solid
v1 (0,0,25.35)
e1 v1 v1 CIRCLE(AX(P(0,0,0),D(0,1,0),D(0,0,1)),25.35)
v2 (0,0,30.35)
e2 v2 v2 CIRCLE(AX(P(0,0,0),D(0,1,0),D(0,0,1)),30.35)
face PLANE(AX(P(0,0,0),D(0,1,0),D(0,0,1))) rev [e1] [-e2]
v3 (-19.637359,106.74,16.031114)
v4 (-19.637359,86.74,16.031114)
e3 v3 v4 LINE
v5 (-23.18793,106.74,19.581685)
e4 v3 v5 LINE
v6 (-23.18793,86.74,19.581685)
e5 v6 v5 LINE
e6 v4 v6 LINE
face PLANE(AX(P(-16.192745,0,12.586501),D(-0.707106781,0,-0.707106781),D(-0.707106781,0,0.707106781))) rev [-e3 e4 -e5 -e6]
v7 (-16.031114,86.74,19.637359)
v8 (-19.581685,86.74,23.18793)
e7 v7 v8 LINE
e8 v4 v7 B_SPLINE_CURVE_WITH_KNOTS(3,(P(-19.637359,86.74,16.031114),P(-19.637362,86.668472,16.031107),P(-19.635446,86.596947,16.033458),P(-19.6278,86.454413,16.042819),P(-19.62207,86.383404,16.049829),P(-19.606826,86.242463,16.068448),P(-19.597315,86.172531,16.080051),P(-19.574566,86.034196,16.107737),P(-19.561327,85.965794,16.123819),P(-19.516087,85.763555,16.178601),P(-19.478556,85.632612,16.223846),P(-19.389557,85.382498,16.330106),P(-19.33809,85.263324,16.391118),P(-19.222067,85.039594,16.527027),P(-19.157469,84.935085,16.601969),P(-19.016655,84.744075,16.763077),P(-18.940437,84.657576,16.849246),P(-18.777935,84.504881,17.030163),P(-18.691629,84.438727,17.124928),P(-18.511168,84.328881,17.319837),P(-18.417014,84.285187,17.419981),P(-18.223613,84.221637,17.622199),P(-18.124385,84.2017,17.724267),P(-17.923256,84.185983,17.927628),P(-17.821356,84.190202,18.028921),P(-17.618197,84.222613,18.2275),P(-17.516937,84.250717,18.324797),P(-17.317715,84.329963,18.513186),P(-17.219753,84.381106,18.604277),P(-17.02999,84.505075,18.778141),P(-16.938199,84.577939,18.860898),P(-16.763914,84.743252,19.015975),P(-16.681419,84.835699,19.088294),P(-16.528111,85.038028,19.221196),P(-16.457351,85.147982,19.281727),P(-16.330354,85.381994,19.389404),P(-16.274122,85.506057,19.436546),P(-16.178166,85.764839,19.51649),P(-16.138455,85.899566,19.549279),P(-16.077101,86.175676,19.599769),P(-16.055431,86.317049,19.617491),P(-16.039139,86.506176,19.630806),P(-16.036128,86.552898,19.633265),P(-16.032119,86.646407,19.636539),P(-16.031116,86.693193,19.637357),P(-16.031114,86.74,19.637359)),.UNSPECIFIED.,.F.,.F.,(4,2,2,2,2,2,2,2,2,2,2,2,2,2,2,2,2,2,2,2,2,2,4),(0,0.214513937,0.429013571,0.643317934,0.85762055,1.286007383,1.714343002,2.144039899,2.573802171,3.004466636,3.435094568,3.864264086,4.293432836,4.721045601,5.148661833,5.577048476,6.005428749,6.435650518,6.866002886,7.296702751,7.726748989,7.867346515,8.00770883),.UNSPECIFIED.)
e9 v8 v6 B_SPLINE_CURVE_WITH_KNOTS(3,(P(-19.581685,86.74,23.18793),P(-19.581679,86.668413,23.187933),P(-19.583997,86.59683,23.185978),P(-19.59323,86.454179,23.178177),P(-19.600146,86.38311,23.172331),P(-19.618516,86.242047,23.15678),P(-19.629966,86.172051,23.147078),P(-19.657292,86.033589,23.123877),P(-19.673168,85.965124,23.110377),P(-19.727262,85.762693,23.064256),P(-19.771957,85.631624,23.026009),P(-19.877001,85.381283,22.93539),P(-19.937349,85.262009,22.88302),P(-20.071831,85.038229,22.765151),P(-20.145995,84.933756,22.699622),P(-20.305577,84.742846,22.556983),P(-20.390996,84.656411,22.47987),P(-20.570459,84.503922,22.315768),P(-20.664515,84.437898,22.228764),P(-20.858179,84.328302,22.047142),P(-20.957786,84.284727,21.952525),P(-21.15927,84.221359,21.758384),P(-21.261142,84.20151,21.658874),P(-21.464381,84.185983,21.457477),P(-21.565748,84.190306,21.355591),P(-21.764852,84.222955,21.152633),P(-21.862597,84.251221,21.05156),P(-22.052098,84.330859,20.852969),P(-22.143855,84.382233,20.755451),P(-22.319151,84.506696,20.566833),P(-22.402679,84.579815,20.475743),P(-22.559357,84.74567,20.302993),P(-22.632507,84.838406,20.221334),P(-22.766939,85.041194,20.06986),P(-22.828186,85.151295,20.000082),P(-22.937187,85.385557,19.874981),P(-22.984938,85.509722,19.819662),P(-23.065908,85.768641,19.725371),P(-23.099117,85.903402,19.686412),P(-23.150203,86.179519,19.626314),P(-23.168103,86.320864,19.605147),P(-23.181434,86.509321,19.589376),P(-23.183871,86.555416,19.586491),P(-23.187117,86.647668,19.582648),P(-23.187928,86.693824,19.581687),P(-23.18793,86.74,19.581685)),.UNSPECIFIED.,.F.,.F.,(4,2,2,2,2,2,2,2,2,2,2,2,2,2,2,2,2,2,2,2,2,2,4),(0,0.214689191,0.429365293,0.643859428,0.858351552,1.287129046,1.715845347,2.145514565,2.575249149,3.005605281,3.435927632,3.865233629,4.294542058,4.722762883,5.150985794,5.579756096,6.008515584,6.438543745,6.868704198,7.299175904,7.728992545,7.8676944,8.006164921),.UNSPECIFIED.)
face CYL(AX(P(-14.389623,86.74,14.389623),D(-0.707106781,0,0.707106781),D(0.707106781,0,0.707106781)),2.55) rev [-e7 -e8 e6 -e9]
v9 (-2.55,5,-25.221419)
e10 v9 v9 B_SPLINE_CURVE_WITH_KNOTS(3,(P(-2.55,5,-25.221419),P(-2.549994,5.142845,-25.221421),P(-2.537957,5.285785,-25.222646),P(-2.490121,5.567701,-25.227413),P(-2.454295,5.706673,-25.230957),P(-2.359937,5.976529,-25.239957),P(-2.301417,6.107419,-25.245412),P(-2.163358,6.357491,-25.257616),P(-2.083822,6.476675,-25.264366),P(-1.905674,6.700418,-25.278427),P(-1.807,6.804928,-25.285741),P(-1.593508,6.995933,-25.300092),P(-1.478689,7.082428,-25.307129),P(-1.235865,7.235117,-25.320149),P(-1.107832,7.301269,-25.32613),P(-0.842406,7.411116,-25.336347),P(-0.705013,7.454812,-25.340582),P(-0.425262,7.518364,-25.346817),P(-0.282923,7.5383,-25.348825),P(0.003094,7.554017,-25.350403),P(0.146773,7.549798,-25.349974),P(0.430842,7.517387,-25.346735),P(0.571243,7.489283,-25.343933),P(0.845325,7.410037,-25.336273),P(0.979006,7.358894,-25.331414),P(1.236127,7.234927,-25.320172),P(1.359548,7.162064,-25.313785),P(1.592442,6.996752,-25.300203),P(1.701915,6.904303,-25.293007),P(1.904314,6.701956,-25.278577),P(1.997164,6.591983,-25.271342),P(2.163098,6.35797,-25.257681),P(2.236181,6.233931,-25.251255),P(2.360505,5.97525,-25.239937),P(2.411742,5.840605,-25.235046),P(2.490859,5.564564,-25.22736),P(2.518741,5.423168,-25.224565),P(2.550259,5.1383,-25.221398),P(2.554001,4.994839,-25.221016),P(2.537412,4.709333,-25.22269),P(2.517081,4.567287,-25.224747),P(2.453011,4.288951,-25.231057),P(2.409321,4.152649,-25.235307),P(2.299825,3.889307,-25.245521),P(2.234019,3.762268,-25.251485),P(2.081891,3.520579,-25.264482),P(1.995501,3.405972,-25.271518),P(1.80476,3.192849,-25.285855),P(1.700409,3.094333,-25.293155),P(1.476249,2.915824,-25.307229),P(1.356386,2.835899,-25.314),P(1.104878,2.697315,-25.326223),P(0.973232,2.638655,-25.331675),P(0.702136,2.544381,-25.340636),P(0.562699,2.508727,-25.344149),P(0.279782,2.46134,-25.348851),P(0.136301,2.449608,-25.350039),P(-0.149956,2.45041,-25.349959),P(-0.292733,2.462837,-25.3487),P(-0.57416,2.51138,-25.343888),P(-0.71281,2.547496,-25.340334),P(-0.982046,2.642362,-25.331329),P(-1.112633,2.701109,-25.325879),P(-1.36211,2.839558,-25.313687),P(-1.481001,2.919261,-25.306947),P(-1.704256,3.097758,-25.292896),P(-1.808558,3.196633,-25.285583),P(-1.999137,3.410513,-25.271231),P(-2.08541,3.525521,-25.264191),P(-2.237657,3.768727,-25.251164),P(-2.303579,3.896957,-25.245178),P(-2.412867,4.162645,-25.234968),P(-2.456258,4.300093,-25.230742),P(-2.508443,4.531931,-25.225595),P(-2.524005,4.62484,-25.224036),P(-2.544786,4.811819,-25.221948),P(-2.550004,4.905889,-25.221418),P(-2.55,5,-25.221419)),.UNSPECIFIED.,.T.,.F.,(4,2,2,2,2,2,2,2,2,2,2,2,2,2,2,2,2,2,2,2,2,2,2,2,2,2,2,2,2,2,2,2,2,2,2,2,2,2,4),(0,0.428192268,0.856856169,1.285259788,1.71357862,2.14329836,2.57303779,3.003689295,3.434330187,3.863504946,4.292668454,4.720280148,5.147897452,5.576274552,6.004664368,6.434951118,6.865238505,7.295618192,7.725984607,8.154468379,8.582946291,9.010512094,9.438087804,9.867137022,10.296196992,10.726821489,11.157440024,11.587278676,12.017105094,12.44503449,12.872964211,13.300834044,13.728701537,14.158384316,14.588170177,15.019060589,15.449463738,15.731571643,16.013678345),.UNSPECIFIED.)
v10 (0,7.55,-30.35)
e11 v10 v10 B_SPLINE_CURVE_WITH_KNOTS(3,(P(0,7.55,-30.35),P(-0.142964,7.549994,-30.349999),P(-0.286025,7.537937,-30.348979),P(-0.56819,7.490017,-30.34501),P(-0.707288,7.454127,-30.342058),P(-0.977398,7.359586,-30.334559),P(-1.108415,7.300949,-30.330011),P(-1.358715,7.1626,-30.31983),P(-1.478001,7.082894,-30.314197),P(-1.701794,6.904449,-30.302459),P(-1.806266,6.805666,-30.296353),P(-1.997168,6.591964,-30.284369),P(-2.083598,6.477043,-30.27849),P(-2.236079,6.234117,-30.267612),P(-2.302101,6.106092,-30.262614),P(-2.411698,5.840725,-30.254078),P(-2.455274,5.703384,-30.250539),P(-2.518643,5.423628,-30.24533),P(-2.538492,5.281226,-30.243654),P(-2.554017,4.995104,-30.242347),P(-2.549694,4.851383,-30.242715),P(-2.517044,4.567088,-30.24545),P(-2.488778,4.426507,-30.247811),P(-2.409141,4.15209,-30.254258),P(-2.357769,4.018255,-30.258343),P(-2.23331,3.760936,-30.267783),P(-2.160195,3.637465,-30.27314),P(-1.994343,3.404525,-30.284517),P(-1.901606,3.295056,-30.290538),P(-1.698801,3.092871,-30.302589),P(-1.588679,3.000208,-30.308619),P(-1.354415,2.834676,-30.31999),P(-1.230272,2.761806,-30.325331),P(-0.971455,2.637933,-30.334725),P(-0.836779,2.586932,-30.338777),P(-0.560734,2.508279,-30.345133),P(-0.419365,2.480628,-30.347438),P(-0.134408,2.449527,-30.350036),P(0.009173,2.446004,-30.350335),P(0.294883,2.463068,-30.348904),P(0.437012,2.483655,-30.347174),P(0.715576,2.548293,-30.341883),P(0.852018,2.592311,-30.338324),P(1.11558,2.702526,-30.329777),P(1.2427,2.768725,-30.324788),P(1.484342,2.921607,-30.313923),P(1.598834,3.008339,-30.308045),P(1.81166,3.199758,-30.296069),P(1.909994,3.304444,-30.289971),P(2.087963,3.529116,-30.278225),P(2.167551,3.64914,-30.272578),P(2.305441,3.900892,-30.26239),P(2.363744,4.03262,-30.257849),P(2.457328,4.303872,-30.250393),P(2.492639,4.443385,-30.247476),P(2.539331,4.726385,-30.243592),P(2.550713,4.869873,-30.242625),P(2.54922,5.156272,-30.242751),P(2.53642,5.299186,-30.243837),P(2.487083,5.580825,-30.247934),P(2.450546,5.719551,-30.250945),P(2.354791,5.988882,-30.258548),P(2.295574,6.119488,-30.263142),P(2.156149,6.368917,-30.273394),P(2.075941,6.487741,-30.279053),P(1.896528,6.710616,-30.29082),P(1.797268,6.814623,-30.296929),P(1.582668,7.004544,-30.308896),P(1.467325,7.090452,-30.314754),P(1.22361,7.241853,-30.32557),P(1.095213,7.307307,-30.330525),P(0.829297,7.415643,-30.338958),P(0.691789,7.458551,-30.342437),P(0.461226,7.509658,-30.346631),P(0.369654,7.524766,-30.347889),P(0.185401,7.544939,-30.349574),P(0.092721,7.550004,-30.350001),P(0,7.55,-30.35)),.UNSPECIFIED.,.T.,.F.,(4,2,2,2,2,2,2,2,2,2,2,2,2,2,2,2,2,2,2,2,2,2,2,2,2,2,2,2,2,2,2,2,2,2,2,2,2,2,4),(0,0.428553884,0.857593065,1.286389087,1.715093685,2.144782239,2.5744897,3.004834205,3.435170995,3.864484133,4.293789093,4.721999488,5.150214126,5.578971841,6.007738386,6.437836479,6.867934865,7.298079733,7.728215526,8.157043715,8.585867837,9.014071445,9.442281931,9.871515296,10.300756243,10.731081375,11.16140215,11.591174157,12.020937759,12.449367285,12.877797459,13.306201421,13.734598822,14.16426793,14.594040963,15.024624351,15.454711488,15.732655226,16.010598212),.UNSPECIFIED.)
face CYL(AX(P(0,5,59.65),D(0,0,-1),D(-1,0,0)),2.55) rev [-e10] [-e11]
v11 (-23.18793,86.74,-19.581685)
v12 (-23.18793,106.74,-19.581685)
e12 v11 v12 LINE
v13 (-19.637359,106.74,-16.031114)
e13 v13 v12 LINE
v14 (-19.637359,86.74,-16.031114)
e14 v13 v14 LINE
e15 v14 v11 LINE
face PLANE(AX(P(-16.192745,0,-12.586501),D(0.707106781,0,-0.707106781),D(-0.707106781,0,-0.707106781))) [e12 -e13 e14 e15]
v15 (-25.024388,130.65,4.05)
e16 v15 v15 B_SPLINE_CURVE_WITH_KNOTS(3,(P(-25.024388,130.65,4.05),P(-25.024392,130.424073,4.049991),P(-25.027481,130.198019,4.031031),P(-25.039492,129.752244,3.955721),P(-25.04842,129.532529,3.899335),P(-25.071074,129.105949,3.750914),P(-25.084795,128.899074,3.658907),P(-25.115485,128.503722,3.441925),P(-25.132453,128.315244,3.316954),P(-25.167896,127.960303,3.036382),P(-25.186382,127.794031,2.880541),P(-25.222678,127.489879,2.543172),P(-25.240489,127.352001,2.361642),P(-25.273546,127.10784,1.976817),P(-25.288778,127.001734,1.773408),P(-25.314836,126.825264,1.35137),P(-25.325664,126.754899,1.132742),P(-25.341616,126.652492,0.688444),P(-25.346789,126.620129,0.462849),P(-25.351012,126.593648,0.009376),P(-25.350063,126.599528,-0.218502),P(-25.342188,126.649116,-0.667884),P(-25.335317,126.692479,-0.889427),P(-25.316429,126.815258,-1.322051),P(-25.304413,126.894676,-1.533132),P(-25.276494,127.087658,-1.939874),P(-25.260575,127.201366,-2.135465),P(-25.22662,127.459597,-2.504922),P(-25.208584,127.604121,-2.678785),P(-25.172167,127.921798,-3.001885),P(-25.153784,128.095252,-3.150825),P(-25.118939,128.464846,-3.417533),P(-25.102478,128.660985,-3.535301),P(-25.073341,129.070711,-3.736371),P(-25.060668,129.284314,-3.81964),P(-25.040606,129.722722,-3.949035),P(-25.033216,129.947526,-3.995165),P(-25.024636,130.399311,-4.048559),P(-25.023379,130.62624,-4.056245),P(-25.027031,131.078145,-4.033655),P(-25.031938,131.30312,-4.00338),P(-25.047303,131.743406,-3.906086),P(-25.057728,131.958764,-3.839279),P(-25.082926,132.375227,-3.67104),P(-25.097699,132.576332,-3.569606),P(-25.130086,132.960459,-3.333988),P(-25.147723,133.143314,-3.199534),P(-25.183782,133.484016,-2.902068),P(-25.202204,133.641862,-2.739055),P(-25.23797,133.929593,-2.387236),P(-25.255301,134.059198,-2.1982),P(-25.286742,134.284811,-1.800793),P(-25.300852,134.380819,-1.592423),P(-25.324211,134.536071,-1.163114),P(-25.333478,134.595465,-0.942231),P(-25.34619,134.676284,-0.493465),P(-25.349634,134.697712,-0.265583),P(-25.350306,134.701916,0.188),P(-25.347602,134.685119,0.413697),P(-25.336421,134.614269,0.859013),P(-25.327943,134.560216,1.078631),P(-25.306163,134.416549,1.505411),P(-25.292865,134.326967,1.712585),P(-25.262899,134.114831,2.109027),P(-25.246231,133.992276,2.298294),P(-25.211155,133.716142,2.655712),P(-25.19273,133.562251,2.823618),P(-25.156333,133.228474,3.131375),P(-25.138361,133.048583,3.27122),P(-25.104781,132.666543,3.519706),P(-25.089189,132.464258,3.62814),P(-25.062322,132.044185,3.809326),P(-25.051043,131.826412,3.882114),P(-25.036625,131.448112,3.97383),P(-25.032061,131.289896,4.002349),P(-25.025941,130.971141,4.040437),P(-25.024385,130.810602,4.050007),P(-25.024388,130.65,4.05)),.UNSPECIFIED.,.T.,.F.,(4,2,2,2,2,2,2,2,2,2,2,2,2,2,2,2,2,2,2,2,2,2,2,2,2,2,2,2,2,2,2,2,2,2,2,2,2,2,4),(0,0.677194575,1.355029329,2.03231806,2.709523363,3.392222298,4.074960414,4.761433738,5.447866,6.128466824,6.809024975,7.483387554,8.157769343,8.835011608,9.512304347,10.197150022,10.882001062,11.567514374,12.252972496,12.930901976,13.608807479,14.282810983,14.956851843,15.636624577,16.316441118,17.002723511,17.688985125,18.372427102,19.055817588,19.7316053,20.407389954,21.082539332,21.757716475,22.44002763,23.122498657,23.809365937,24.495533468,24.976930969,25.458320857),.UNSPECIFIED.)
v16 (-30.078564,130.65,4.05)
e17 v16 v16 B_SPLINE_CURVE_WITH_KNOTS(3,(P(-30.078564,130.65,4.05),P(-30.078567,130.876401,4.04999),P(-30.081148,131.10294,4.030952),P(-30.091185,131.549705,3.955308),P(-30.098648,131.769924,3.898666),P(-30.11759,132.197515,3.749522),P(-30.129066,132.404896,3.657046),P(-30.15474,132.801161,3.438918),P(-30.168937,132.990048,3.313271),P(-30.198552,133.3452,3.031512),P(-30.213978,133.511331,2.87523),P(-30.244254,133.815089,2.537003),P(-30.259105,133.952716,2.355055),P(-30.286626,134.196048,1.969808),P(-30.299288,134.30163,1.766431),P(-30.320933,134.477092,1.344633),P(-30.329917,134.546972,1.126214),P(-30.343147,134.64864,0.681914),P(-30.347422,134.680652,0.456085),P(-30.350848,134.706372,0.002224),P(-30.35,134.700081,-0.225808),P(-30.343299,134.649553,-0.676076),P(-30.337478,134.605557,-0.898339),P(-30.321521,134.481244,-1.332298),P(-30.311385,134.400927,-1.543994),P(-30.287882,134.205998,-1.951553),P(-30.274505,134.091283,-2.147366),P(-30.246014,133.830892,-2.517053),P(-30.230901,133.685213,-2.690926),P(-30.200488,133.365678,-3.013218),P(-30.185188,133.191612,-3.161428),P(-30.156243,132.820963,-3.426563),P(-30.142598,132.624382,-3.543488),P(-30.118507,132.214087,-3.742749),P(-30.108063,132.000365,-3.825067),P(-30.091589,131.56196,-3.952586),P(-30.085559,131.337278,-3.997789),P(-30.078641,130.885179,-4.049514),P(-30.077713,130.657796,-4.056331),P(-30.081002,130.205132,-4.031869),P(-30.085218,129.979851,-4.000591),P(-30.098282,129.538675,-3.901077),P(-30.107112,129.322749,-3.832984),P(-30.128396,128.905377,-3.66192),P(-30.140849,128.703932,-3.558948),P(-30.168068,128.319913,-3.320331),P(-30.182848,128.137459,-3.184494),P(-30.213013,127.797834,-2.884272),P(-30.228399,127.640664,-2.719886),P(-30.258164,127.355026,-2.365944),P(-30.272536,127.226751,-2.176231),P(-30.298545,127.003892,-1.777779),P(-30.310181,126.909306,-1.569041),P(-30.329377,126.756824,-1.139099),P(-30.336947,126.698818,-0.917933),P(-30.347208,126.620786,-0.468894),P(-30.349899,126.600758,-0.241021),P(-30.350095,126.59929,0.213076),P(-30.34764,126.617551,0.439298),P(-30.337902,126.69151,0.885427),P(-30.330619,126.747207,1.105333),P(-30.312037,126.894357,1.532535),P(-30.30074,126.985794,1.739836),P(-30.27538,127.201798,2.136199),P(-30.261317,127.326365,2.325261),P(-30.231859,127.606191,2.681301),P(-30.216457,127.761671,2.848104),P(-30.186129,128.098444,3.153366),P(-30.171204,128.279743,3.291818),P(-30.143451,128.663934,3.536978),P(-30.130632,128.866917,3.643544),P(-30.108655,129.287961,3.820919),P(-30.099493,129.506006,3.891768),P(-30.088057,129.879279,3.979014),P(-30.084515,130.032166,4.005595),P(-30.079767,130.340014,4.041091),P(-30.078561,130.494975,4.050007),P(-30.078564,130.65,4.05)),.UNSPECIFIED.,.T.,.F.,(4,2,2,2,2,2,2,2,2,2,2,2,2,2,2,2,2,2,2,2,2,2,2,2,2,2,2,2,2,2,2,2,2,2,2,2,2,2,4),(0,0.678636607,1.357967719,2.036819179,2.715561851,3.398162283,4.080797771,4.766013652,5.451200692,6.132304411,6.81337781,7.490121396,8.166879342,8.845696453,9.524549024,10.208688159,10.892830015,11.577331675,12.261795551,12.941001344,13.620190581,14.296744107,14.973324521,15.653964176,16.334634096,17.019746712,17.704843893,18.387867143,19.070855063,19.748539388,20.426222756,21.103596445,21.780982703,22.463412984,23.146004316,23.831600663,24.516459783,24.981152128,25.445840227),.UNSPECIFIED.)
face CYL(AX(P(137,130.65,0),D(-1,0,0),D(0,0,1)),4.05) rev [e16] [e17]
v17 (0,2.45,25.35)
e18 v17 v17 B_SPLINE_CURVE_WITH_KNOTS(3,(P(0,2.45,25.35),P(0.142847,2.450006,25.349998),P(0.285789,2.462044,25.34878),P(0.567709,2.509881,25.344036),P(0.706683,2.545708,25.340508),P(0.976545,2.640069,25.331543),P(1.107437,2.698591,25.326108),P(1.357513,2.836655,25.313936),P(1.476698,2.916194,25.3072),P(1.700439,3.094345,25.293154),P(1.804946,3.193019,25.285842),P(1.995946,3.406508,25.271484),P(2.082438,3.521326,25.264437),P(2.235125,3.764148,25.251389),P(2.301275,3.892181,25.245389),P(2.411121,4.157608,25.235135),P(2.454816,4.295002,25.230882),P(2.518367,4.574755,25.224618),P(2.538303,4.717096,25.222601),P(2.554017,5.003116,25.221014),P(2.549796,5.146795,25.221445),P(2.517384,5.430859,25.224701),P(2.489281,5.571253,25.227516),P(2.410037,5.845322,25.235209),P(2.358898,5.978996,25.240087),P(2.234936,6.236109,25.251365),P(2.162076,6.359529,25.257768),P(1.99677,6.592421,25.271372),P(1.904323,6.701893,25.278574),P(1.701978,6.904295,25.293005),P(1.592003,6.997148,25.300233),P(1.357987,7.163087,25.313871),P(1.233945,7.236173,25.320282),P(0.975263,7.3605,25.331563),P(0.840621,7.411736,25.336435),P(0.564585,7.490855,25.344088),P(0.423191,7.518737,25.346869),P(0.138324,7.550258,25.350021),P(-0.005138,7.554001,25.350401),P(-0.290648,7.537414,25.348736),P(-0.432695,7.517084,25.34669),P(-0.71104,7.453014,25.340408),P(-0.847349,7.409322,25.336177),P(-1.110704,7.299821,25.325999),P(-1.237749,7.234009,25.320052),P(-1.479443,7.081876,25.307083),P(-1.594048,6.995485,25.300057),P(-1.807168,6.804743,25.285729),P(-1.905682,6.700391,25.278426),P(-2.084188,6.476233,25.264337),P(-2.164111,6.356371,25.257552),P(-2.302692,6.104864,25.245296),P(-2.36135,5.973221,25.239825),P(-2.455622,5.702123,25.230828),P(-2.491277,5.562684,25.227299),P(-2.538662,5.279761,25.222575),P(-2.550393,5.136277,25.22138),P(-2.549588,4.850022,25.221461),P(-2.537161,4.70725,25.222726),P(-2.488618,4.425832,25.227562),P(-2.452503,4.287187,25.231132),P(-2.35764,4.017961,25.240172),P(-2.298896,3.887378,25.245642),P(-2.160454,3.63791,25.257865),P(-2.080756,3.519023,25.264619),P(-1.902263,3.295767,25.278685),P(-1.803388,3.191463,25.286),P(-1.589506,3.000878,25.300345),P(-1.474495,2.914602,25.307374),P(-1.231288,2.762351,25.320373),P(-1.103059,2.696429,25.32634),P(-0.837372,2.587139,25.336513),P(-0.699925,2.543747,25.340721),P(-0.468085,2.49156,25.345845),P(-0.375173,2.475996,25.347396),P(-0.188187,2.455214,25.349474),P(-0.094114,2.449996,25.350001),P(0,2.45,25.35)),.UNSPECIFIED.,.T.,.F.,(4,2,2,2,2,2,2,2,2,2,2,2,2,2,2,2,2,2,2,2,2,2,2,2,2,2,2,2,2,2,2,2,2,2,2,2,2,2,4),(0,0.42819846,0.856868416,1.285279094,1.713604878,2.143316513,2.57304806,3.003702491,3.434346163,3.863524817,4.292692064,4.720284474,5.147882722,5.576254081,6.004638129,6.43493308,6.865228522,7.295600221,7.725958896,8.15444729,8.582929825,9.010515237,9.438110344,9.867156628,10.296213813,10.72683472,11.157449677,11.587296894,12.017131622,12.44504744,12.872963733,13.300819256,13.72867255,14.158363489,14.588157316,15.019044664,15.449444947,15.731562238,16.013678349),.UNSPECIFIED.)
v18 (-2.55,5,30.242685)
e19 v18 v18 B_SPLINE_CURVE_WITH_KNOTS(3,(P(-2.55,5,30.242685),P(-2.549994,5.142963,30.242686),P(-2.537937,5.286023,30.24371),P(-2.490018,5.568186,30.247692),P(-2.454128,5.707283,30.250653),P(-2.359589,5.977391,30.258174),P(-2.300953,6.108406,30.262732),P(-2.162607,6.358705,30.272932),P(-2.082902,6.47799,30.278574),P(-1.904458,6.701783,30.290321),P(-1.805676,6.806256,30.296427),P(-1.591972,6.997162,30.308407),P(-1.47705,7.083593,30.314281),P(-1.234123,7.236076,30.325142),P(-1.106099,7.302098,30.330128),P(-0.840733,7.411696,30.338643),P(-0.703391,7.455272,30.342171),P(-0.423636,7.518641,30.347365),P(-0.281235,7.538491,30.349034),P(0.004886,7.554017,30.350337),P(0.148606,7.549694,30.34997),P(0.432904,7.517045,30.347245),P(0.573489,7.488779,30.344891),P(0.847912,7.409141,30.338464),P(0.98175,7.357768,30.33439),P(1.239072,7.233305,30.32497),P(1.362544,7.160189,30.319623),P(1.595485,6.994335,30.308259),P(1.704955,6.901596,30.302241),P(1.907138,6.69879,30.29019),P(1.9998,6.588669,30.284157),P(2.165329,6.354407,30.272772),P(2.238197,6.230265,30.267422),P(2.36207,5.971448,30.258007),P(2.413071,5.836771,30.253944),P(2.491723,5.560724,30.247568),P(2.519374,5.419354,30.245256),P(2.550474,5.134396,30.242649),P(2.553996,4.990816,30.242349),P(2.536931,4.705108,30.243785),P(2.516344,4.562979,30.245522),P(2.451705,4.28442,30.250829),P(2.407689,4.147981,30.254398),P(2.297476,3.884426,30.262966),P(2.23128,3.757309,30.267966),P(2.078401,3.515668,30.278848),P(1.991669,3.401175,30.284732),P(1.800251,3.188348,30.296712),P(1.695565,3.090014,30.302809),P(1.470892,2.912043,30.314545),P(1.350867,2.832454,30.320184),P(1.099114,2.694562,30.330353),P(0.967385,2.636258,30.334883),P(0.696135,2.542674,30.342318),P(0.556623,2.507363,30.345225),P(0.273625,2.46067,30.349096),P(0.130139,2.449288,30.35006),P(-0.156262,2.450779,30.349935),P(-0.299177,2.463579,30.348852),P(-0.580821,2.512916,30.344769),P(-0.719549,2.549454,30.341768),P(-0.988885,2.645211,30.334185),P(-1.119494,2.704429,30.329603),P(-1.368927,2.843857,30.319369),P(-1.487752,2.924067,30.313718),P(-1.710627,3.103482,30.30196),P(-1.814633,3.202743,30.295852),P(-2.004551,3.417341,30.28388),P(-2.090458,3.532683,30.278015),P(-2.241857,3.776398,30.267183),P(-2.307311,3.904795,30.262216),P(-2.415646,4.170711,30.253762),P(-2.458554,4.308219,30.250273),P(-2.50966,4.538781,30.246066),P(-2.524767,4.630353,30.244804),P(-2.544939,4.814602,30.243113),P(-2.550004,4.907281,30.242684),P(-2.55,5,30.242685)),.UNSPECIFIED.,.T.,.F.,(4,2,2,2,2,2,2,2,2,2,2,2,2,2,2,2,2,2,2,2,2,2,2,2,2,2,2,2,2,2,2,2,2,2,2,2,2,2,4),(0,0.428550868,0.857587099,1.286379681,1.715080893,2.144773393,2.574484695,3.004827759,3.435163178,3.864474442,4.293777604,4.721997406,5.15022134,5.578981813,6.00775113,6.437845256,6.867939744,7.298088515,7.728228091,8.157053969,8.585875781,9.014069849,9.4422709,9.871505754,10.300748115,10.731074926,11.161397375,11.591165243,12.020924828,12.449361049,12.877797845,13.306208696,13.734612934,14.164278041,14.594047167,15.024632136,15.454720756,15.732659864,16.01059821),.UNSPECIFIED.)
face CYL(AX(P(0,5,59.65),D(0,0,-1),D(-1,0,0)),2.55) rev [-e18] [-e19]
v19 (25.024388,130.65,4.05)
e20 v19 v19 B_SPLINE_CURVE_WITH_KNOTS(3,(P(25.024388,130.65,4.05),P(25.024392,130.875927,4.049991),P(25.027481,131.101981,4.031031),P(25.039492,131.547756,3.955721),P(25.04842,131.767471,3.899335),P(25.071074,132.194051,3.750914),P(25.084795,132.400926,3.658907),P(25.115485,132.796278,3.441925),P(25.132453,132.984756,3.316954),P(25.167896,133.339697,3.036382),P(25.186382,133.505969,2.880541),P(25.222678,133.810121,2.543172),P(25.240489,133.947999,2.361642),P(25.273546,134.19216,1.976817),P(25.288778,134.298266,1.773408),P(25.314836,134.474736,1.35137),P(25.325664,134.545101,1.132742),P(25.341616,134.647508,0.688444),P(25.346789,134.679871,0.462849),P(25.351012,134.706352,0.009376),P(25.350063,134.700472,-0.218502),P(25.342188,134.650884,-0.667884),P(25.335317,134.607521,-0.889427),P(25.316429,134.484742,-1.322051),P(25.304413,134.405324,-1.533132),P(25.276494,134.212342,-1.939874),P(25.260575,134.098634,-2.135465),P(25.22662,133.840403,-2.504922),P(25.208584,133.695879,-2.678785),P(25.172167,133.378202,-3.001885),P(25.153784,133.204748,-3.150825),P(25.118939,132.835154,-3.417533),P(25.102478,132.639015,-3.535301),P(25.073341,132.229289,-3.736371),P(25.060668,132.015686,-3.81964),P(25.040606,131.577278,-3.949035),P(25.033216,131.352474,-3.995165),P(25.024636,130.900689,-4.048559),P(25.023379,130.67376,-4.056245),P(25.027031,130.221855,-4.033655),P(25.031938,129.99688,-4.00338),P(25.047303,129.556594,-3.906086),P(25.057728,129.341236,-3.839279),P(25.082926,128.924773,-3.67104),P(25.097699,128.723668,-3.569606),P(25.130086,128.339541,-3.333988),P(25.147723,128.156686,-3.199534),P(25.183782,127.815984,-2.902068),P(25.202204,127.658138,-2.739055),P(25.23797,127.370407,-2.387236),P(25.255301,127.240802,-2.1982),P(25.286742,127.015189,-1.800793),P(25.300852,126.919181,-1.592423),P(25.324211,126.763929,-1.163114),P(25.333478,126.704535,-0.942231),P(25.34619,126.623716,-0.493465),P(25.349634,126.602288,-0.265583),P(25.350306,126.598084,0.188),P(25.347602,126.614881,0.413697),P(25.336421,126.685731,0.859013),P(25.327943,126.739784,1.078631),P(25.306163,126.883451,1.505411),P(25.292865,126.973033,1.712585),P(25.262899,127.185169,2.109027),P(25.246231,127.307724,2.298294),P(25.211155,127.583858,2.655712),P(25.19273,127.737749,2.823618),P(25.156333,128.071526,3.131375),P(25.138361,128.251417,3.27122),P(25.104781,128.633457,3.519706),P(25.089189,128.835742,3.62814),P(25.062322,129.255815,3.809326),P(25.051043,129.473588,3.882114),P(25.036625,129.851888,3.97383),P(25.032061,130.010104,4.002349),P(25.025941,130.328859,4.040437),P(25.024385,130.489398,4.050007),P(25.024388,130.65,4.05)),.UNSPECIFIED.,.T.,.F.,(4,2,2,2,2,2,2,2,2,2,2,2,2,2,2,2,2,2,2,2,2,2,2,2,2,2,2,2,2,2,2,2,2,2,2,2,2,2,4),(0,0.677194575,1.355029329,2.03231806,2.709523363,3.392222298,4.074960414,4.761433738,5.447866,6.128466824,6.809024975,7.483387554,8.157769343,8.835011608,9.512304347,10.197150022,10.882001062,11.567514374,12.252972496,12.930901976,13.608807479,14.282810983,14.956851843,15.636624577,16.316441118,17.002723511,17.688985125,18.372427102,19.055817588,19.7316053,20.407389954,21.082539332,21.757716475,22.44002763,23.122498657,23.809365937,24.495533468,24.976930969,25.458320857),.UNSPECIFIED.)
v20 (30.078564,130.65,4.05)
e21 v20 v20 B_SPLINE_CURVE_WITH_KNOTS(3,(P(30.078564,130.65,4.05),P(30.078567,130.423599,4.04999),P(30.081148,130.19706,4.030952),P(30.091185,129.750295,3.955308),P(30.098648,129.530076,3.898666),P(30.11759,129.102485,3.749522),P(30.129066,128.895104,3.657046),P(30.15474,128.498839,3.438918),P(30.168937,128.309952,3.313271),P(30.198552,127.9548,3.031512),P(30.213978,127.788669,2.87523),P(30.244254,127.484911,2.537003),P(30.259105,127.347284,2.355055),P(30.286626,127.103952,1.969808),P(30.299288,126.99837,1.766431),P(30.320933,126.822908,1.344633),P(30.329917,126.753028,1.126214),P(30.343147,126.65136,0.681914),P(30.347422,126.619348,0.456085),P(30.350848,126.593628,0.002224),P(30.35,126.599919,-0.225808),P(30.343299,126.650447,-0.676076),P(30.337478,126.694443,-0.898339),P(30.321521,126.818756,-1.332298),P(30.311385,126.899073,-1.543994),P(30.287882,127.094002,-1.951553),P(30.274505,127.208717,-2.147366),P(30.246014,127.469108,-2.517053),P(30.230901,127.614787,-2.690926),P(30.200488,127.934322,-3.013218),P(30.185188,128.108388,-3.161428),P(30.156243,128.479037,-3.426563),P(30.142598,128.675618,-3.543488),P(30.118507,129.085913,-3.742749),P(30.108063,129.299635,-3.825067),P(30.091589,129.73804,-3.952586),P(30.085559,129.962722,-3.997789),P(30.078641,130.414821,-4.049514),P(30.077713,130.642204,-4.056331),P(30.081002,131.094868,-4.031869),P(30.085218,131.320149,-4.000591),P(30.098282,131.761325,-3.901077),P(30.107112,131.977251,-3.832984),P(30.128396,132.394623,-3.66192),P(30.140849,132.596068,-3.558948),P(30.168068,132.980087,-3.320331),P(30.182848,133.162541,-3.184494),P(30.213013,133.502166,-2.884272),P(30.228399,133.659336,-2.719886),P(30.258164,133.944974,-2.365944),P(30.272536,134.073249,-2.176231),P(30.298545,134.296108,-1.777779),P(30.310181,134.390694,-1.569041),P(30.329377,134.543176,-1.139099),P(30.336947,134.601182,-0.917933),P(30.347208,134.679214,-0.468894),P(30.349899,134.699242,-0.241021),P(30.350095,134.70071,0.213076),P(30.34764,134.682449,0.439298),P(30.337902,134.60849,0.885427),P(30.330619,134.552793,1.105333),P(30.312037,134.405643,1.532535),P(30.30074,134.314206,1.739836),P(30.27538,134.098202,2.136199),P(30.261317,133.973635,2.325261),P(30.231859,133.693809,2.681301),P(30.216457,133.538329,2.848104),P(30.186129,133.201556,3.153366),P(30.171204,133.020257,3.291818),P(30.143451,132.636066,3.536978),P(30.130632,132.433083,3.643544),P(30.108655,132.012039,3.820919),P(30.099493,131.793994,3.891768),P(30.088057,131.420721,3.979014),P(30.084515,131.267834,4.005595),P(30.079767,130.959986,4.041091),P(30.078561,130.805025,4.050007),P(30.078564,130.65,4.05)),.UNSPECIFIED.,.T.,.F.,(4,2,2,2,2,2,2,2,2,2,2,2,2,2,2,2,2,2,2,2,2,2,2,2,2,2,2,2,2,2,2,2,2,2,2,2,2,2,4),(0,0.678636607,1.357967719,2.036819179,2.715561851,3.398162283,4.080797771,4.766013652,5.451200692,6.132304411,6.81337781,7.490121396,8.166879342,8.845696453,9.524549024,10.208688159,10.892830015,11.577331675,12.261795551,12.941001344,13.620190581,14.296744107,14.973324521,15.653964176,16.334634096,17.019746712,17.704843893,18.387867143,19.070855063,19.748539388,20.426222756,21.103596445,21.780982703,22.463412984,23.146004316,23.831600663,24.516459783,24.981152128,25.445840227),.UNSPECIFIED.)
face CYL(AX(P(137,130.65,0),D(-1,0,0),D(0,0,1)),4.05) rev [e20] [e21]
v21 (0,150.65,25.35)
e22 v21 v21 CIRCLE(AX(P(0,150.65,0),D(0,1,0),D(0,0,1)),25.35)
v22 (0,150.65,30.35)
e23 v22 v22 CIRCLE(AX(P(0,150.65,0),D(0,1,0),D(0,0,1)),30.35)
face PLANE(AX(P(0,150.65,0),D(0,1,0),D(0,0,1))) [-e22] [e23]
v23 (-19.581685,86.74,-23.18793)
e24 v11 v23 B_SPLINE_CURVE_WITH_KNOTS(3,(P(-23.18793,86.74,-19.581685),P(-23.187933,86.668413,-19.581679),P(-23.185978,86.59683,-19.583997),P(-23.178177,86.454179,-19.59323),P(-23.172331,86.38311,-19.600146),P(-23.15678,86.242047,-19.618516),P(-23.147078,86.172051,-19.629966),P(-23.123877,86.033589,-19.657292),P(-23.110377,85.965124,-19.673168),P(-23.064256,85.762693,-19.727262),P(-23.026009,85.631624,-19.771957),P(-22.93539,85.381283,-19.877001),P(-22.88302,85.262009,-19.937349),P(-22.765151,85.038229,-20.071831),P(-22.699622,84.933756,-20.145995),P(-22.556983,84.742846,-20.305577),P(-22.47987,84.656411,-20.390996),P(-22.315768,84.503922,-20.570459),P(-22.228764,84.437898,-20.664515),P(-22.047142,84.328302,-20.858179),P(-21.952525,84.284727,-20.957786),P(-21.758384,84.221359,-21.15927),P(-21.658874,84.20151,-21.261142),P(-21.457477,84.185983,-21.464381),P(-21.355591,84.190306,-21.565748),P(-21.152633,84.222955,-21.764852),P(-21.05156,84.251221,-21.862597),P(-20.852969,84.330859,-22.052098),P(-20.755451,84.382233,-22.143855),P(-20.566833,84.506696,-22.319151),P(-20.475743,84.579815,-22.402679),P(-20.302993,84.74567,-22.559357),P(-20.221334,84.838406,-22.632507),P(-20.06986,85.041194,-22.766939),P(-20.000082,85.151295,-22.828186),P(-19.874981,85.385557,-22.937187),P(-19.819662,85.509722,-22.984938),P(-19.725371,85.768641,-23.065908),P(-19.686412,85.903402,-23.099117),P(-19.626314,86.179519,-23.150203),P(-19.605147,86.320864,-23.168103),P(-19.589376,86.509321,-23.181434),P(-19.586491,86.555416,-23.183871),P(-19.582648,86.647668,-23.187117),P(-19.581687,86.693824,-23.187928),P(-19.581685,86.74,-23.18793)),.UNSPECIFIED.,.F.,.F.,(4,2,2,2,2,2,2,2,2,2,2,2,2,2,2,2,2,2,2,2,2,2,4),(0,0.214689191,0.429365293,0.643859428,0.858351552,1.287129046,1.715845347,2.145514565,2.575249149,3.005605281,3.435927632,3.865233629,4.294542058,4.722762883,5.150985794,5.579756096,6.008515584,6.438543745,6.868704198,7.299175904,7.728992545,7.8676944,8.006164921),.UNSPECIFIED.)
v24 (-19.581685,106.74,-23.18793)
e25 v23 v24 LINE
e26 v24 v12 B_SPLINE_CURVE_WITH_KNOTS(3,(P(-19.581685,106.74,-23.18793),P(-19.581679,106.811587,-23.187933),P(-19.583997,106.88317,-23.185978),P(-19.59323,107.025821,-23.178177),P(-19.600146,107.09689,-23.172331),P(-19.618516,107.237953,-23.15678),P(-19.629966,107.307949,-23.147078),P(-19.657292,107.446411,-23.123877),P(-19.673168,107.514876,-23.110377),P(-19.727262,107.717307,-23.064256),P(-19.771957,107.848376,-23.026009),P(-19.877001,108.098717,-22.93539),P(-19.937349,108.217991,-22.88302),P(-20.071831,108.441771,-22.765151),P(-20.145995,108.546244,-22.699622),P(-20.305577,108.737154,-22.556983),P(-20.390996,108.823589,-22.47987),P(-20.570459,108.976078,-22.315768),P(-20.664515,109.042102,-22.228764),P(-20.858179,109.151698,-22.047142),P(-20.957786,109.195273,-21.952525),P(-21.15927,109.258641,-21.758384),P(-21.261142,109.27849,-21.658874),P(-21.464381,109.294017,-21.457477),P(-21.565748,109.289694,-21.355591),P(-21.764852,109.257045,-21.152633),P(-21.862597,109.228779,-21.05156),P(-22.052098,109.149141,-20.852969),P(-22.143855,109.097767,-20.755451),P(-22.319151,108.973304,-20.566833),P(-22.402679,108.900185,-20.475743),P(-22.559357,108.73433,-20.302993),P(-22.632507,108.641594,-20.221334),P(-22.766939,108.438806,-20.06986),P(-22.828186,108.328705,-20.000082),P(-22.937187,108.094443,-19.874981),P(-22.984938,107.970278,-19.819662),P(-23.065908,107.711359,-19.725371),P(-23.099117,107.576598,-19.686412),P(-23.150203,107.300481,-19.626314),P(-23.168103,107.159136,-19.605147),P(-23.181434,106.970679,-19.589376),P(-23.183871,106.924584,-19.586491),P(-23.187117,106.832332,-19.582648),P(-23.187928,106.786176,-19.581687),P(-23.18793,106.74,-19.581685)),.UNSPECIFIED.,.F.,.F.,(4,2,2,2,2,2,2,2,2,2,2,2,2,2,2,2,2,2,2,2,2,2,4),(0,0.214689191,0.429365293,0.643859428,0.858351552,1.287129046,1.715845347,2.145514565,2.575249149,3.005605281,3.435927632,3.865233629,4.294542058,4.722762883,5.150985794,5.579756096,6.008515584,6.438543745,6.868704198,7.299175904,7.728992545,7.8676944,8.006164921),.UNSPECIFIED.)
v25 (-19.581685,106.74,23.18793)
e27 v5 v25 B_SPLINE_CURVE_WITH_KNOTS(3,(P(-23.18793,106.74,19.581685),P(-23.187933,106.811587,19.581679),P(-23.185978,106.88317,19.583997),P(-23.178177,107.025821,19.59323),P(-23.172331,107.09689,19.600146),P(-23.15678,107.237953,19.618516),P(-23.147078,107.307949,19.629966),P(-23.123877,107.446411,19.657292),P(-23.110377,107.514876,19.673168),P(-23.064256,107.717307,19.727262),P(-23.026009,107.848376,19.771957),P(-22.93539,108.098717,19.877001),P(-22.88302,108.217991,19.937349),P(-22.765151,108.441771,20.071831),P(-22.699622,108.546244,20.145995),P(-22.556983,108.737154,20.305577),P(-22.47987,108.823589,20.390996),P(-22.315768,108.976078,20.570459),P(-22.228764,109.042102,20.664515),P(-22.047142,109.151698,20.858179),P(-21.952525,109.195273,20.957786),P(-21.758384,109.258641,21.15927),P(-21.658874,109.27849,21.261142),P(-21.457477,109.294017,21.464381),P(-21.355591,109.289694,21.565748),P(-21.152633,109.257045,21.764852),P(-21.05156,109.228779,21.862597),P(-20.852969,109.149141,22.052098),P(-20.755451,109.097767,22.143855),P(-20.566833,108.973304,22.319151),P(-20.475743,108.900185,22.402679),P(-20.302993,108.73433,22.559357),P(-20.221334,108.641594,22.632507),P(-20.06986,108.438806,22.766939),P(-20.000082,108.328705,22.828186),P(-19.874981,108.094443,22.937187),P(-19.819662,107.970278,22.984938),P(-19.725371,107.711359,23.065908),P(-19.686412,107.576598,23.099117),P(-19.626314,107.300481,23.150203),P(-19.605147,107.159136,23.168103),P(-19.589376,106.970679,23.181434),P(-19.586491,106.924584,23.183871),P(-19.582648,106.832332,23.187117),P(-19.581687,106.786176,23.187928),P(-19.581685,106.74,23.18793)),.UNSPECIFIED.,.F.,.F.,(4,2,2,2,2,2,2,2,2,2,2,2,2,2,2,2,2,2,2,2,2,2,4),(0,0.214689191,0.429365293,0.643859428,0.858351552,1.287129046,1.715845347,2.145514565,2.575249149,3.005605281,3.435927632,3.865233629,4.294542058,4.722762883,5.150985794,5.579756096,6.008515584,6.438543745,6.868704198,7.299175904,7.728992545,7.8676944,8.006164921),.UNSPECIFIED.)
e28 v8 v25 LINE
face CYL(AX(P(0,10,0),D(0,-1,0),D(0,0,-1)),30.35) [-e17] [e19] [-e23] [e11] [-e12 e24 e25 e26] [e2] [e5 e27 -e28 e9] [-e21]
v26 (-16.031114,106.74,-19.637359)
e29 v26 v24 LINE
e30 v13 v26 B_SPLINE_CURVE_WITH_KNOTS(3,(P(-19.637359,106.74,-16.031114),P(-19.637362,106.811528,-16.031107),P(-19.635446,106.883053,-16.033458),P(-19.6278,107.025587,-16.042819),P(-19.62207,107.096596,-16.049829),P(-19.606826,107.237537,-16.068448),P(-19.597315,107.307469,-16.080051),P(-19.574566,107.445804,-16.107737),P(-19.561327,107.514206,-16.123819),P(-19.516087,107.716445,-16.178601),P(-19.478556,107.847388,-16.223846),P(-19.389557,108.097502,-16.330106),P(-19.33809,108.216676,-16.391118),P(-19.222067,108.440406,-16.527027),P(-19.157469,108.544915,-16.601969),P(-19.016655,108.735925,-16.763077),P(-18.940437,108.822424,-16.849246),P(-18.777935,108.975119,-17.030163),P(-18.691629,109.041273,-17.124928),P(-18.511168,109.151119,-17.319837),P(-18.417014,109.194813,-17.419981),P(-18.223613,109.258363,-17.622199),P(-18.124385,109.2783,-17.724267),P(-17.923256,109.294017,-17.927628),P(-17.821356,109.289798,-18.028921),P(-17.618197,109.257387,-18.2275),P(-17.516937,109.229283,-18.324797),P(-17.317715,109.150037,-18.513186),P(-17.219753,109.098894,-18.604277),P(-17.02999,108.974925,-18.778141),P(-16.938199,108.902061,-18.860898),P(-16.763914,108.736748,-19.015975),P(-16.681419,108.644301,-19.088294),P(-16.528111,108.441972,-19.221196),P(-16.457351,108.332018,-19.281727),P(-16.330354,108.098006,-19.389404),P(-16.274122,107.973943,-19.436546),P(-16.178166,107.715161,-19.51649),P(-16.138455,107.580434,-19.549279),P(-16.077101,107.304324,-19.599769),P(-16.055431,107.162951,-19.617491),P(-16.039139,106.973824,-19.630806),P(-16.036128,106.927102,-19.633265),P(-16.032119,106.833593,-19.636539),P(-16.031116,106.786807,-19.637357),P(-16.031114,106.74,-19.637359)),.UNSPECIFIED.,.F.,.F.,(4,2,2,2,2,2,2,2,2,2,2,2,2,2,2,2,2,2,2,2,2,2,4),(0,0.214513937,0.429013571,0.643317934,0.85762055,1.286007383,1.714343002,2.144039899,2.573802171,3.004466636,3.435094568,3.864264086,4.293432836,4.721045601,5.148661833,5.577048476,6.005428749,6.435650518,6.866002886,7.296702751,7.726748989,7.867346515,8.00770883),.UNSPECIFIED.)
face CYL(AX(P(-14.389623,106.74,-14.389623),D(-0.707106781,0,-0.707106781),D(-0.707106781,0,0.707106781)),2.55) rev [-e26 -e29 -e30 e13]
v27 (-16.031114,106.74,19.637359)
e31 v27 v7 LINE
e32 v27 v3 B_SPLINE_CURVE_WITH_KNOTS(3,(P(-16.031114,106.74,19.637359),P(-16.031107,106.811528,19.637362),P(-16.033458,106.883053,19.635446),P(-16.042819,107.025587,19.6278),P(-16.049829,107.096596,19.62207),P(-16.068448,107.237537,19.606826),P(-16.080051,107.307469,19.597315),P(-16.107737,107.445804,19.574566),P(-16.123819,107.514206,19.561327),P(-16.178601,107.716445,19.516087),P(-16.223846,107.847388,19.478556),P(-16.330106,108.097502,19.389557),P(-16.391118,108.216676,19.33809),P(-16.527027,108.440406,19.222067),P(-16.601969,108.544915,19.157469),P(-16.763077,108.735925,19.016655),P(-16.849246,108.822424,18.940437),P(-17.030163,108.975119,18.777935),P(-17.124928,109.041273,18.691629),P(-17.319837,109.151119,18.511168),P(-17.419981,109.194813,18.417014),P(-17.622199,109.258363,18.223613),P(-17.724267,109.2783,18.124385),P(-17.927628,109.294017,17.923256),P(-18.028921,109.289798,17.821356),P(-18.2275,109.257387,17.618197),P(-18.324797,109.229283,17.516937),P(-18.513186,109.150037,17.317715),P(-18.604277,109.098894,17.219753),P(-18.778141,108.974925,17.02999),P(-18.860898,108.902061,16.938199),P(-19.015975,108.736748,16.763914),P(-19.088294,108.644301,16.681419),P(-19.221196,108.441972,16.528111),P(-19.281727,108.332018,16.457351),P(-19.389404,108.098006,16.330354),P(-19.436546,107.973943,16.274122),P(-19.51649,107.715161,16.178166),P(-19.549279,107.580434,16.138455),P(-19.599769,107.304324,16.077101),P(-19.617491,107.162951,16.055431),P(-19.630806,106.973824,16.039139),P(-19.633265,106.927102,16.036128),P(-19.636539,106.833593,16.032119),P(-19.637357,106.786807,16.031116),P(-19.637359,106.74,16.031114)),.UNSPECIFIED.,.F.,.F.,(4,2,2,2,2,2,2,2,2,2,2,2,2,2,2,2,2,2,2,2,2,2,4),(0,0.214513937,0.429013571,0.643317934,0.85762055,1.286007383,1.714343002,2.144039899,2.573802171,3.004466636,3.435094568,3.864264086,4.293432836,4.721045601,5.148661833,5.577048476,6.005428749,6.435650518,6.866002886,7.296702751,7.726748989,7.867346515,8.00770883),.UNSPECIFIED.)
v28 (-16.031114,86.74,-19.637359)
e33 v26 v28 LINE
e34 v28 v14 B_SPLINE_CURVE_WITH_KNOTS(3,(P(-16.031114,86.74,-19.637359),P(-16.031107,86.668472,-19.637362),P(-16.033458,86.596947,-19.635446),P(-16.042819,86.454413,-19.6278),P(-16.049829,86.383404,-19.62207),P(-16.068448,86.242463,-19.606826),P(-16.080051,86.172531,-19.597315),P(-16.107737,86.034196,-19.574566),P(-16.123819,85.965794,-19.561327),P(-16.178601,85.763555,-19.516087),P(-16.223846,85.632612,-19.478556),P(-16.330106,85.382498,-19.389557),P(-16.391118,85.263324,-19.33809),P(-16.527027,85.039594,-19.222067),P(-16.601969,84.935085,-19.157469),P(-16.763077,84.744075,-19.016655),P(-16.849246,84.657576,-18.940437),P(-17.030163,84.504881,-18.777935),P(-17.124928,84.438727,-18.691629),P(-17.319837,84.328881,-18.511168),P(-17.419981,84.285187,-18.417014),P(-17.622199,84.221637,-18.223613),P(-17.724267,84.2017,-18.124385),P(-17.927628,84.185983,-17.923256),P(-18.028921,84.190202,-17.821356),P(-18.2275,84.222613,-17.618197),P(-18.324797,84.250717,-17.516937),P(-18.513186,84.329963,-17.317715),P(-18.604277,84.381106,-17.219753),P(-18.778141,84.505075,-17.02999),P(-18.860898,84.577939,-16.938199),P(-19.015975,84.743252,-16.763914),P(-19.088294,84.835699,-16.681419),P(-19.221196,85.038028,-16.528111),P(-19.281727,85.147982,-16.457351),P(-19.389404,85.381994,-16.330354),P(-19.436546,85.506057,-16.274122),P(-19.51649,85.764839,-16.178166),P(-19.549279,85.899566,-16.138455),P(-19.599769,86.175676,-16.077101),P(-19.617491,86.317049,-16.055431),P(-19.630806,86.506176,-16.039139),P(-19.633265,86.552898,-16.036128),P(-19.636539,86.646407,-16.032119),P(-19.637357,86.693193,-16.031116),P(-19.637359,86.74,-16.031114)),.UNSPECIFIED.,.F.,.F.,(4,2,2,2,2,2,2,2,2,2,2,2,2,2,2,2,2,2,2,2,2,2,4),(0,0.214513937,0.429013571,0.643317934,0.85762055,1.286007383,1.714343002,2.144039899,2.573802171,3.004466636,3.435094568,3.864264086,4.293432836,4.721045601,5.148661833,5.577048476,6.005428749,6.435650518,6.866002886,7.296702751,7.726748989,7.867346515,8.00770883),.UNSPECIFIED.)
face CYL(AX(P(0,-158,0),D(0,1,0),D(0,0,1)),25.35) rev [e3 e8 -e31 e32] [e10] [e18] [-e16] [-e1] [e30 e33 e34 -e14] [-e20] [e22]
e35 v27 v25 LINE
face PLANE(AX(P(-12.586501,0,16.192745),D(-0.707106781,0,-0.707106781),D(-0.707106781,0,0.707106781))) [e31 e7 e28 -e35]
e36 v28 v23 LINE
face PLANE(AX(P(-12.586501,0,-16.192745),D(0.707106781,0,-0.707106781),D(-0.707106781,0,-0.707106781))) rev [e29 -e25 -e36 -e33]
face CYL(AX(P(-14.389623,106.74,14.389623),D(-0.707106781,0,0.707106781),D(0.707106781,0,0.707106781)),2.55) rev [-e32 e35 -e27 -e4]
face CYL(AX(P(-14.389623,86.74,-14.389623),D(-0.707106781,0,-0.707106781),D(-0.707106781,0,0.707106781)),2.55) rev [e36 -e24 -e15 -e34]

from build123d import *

# Parameters (mm, degrees)
SKETCH1_R               = 30.35
BOSS_EXTRUDE1_DEPTH     = 10
SKETCH2_R               = 30.35
BOSS_EXTRUDE2_DEPTH     = 140.65
SKETCH4_R               = 25.35
CUT_EXTRUDE1_DEPTH      = 308.65
SKETCH6_R               = 2.55
CUT_EXTRUDE3_DEPTH      = 90
CUT_EXTRUDE4_START      = -6
CUT_EXTRUDE4_DEPTH      = 7
CUT_EXTRUDE5_DEPTH      = 10
CUT_EXTRUDE6_DEPTH      = 137
CUT_EXTRUDE6_DEPTH_BACK = 137
SKETCH10_R              = 4.05


with BuildPart() as part:
    # Sketch1 → Boss-Extrude1 (new body)
    with BuildSketch(Plane(origin=(0, 0, 0), x_dir=(1, 0, 0), z_dir=(0, 1, 0))):
        with Locations(Location((0, 0, 0), (0, 0, 270))):
            Circle(SKETCH1_R)
    extrude(amount=BOSS_EXTRUDE1_DEPTH)

    # Sketch2 → Boss-Extrude2 (add)
    with BuildSketch(Plane(origin=(0, 10, 0), x_dir=(1, 0, 0), z_dir=(0, 1, 0))):
        with Locations(Location((0, 0, 0), (0, 0, 270))):
            Circle(SKETCH2_R)
    extrude(amount=BOSS_EXTRUDE2_DEPTH)

    # Sketch4 → Cut-Extrude1 (cut)
    with BuildSketch(Plane(origin=(0, 150.65, 0), x_dir=(1, 0, 0), z_dir=(0, 1, 0))):
        with Locations(Location((0, 0, 0), (0, 0, 270))):
            Circle(SKETCH4_R)
    extrude(amount=-CUT_EXTRUDE1_DEPTH, mode=Mode.SUBTRACT)

    # Sketch6 → Cut-Extrude3 (cut)
    with BuildSketch(Plane(origin=(0, 0, -30.35), x_dir=(-1, 0, 0), z_dir=(0, 0, -1))):
        with Locations((0, 5)):
            Circle(SKETCH6_R)
    extrude(amount=-CUT_EXTRUDE3_DEPTH, mode=Mode.SUBTRACT)

    # Cut-Extrude4: read off the stored shape, not the designer's step
    # Cut-Extrude4 outline → Cut-Extrude4 (cut)
    with BuildSketch(Plane(origin=(-21.460690809, 0, -21.460690809), x_dir=(0, -1, 0), z_dir=(-0.7071067811865417, 0, -0.7071067811865533)).offset(CUT_EXTRUDE4_START)):
        with BuildLine():
            ThreePointArc((-106.74, 2.55), (-109.29, 0), (-106.74, -2.55))
            Line((-106.74, -2.55), (-86.74, -2.55))
            ThreePointArc((-86.74, -2.55), (-84.19, 0), (-86.74, 2.55))
            Line((-86.74, 2.55), (-106.74, 2.55))
        make_face()
    extrude(amount=CUT_EXTRUDE4_DEPTH, mode=Mode.SUBTRACT)

    # Sketch9 → Cut-Extrude5 (cut)
    with BuildSketch(Plane(origin=(-21.460690809, 0, 21.460690809), x_dir=(0, -1, 0), z_dir=(-0.7071067811865512, 0, 0.7071067811865438))):
        with BuildLine():
            Line((-86.74, 2.55), (-106.74, 2.55))
            ThreePointArc((-106.74, 2.55), (-109.29, 0), (-106.74, -2.55))
            Line((-106.74, -2.55), (-86.74, -2.55))
            ThreePointArc((-86.74, -2.55), (-84.19, 0), (-86.74, 2.55))
        make_face()
    extrude(amount=-CUT_EXTRUDE5_DEPTH, mode=Mode.SUBTRACT)

    # Sketch10 → Cut-Extrude6 (cut, two sides: drawn at the far end of the back side and taken through both)
    with BuildSketch(Plane(origin=(0, 0, 0), x_dir=(0, 0, -1), z_dir=(1, 0, 0)).offset(-CUT_EXTRUDE6_DEPTH_BACK)):
        with Locations(Location((0, 130.65, 0), (0, 0, 180))):
            Circle(SKETCH10_R)
    extrude(amount=CUT_EXTRUDE6_DEPTH + CUT_EXTRUDE6_DEPTH_BACK, mode=Mode.SUBTRACT)


solid = part.part
